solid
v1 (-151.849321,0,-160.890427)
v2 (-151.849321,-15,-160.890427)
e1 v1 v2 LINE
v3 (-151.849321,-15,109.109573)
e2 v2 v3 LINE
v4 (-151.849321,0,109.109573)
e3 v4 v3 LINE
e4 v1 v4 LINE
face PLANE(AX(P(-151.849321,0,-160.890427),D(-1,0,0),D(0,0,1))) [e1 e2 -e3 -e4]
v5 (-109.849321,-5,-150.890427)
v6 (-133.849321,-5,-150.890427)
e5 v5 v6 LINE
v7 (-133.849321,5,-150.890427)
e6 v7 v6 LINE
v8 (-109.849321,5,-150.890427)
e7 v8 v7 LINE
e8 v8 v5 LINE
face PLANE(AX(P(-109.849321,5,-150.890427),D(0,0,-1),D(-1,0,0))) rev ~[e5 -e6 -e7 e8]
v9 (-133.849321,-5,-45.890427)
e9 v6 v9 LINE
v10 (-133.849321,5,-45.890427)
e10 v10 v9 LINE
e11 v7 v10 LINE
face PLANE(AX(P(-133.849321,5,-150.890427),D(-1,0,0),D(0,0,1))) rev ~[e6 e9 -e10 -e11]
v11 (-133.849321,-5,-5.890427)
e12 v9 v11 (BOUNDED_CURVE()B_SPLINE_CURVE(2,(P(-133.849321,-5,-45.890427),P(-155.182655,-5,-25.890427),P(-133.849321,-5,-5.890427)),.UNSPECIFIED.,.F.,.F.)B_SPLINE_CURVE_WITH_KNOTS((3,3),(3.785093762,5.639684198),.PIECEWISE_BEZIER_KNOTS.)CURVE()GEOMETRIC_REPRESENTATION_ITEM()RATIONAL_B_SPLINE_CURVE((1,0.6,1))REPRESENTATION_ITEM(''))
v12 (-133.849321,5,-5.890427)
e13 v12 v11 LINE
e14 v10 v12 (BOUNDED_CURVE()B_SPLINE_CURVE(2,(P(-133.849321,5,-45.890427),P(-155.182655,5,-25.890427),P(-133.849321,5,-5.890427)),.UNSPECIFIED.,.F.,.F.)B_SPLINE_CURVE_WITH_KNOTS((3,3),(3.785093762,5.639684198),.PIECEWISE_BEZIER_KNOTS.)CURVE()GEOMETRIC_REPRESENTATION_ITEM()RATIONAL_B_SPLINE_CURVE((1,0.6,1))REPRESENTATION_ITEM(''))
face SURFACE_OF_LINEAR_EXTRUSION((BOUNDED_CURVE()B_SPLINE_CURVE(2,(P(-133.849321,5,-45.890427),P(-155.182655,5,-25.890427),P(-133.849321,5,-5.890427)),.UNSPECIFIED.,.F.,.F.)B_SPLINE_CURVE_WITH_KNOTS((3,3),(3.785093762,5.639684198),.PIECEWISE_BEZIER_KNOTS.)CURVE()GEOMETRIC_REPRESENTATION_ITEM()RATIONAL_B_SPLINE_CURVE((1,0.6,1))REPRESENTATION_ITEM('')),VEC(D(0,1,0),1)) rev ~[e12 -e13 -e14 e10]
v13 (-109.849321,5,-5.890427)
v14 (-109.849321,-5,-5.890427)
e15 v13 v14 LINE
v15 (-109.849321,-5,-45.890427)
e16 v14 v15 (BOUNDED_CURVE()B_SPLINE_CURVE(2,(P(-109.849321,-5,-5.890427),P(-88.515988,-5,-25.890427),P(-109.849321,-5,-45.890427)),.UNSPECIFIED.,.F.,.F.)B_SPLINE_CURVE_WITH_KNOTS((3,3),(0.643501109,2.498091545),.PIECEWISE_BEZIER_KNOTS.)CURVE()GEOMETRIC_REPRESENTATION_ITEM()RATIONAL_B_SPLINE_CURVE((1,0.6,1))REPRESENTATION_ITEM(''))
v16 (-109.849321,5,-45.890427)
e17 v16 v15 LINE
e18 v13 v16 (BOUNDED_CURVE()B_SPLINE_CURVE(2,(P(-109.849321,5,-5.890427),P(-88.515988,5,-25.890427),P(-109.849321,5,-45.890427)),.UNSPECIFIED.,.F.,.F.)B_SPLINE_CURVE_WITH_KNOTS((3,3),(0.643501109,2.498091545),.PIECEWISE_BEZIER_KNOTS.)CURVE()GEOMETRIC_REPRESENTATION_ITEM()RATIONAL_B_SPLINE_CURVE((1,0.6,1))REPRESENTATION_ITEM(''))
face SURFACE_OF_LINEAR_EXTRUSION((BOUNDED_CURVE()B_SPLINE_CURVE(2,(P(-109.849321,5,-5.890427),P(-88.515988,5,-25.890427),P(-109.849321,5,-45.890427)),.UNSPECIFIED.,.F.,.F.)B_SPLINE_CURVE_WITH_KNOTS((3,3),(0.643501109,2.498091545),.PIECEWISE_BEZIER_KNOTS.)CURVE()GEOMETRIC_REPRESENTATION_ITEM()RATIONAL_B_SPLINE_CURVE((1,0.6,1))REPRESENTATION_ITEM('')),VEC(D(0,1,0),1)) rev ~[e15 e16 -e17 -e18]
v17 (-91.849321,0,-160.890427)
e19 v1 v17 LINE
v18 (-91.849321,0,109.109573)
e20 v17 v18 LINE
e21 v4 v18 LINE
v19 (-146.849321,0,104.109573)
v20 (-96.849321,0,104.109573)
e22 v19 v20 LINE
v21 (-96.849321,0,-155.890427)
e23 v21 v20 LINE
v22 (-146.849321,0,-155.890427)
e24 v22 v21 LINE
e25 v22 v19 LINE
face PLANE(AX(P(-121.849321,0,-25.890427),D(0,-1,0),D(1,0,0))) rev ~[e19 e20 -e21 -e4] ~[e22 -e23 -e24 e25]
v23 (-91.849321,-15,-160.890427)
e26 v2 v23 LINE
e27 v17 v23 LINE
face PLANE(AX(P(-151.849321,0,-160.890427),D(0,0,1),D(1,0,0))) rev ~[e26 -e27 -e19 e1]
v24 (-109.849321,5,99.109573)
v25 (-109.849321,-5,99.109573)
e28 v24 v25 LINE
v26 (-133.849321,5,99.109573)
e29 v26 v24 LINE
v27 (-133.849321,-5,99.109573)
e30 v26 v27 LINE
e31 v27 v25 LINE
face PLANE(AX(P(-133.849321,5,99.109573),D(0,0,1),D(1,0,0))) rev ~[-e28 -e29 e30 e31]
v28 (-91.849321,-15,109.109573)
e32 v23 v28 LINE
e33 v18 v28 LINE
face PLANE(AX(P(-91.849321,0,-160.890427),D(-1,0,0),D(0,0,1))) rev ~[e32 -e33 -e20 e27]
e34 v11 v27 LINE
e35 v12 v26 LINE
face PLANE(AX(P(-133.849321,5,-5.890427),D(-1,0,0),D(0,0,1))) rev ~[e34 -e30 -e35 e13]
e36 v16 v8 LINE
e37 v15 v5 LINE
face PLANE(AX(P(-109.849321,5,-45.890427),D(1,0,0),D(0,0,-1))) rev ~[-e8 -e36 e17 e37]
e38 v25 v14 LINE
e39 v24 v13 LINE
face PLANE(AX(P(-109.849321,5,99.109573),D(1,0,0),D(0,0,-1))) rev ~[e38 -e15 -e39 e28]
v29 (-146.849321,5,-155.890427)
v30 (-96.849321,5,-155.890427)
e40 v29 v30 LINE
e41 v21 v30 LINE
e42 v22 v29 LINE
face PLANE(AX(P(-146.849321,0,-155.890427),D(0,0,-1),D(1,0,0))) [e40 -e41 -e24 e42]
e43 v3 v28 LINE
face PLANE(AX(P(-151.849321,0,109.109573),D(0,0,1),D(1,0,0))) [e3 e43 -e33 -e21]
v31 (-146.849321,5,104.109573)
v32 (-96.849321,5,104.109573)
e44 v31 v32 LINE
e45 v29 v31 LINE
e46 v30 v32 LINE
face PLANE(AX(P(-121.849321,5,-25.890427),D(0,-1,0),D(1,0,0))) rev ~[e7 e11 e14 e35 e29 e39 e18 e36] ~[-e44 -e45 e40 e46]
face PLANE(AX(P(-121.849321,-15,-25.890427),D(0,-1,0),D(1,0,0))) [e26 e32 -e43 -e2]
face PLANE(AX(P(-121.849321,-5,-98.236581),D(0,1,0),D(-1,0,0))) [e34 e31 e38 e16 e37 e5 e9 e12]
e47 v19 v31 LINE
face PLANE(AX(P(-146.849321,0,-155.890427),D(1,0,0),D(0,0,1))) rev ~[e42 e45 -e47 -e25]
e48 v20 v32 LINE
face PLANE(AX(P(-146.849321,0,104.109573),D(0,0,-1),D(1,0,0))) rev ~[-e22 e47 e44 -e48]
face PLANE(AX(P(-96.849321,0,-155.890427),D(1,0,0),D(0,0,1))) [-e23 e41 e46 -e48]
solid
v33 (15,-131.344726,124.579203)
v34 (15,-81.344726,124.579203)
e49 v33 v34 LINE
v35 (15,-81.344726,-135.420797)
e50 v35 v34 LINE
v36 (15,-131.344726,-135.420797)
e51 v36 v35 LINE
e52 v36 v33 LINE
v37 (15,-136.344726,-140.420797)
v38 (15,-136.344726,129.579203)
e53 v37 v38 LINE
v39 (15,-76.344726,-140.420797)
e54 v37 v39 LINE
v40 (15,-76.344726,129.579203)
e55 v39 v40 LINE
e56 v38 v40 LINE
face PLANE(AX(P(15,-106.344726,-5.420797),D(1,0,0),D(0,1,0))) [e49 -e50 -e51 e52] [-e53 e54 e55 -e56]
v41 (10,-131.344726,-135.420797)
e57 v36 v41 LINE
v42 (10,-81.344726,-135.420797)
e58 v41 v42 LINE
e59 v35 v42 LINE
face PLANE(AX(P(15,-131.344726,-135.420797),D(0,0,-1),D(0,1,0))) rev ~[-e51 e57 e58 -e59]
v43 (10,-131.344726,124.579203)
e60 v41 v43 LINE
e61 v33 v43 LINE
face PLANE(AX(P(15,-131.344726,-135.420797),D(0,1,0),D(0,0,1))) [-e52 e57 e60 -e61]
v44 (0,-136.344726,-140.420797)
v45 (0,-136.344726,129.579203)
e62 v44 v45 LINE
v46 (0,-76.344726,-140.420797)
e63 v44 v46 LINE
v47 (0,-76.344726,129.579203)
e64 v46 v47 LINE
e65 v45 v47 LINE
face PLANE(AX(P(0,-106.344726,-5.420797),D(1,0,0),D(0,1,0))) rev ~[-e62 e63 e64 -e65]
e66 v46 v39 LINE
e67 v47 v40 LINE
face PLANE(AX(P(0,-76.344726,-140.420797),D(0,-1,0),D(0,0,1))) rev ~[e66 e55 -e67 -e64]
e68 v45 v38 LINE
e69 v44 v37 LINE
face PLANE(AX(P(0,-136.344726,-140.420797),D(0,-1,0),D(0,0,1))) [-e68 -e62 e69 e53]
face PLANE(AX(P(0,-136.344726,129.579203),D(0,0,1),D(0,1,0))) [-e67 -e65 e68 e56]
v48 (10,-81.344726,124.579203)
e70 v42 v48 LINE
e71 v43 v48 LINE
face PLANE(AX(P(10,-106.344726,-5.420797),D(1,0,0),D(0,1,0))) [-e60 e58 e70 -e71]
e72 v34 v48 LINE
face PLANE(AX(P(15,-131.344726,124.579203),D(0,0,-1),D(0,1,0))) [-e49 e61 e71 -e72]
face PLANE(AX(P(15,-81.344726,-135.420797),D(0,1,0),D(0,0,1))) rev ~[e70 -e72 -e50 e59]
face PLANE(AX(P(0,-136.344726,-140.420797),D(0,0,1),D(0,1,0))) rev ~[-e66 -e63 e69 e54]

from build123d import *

# Parameters (mm, degrees)
F0_W     = 60
F0_H     = 270
F2_DEPTH = 15
F3_W     = 50
F3_H     = 260
F4_DEPTH = 5
F1_W     = 60
F1_H     = 270
F5_DEPTH = 15
F6_W     = 50
F6_H     = 260
F7_DEPTH = 5
F9_DEPTH = 10


# Not quite as in the source:
# - a feature names something its author has since deleted; it is built from what else it names


with BuildPart() as f2:
    # F0 (on Front) → F2 (new body)
    with BuildSketch(Plane.XZ):
        with Locations((-121.8493213905, -25.8904273567)):
            Rectangle(F0_W, F0_H)
    extrude(amount=F2_DEPTH)

    # F3 (on face) → F4 (join)
    with BuildSketch(Plane.XZ):
        with Locations((-121.8493213905, -25.8904273567)):
            Rectangle(F3_W, F3_H)
    extrude(amount=-F4_DEPTH)

    # F8 (on face) → F9 (cut)
    with BuildSketch(Plane(origin=(0, 5, 0), x_dir=(-1, 0, 0), z_dir=(0, 1, 0))):
        with BuildLine():
            Line((109.8493213905, -150.8904273567), (133.8493213905, -150.8904273567))
            Line((133.8493213905, -150.8904273567), (133.8493213905, -45.8904273567))
            add(Edge.make_bspline(
                [(109.8493213905, -45.8904273567), (121.8493213905, -57.1404273567), (133.8493213905, -45.8904273567)],
                knots=[2.4980915448, 2.4980915448, 2.4980915448, 3.7850937624, 3.7850937624, 3.7850937624], degree=2, weights=[1, 0.8, 1]))
            Line((109.8493213905, -45.8904273567), (109.8493213905, -150.8904273567))
        make_face()
        with BuildLine():
            add(Edge.make_bspline(
                [(133.8493213905, -5.8904273567), (128.5159880572, -0.8904273567), (121.8493213905, -0.8904273567)],
                knots=[5.6396841984, 5.6396841984, 5.6396841984, 6.2831853072, 6.2831853072, 6.2831853072], degree=2, weights=[1, 0.9486832981, 1]))
            Line((133.8493213905, -5.8904273567), (133.8493213905, 99.1095726433))
            Line((133.8493213905, 99.1095726433), (109.8493213905, 99.1095726433))
            Line((109.8493213905, 99.1095726433), (109.8493213905, -5.8904273567))
            add(Edge.make_bspline(
                [(121.8493213905, -0.8904273567), (115.1826547239, -0.8904273567), (109.8493213905, -5.8904273567)],
                knots=[0, 0, 0, 0.6435011088, 0.6435011088, 0.6435011088], degree=2, weights=[1, 0.9486832981, 1]))
        make_face()
        with BuildLine():
            Line((133.8493213905, -5.8904273567), (133.8493213905, -45.8904273567))
            add(Edge.make_bspline(
                [(133.8493213905, -45.8904273567), (155.1826547239, -25.8904273567), (133.8493213905, -5.8904273567)],
                knots=[3.7850937624, 3.7850937624, 3.7850937624, 5.6396841984, 5.6396841984, 5.6396841984], degree=2, weights=[1, 0.6, 1]))
        make_face()
        with BuildLine():
            add(Edge.make_bspline(
                [(109.8493213905, -45.8904273567), (121.8493213905, -57.1404273567), (133.8493213905, -45.8904273567)],
                knots=[2.4980915448, 2.4980915448, 2.4980915448, 3.7850937624, 3.7850937624, 3.7850937624], degree=2, weights=[1, 0.8, 1]))
            Line((133.8493213905, -45.8904273567), (133.8493213905, -5.8904273567))
            add(Edge.make_bspline(
                [(133.8493213905, -5.8904273567), (128.5159880572, -0.8904273567), (121.8493213905, -0.8904273567)],
                knots=[5.6396841984, 5.6396841984, 5.6396841984, 6.2831853072, 6.2831853072, 6.2831853072], degree=2, weights=[1, 0.9486832981, 1]))
            add(Edge.make_bspline(
                [(121.8493213905, -0.8904273567), (115.1826547239, -0.8904273567), (109.8493213905, -5.8904273567)],
                knots=[0, 0, 0, 0.6435011088, 0.6435011088, 0.6435011088], degree=2, weights=[1, 0.9486832981, 1]))
            Line((109.8493213905, -5.8904273567), (109.8493213905, -45.8904273567))
        make_face()
        with BuildLine():
            add(Edge.make_bspline(
                [(109.8493213905, -5.8904273567), (88.5159880572, -25.8904273567), (109.8493213905, -45.8904273567)],
                knots=[0.6435011088, 0.6435011088, 0.6435011088, 2.4980915448, 2.4980915448, 2.4980915448], degree=2, weights=[1, 0.6, 1]))
            Line((109.8493213905, -45.8904273567), (109.8493213905, -5.8904273567))
        make_face()
    extrude(amount=-F9_DEPTH, mode=Mode.SUBTRACT)


with BuildPart() as f5:
    # F1 (on Right) → F5 (new body)
    with BuildSketch(Plane.YZ):
        with Locations((-106.3447256267, -5.4207965732)):
            Rectangle(F1_W, F1_H)
    extrude(amount=F5_DEPTH)

    # F6 (on face) → F7 (cut)
    with BuildSketch(Plane.YZ.offset(15)):
        with Locations((-106.3447256267, -5.4207965732)):
            Rectangle(F6_W, F6_H)
    extrude(amount=-F7_DEPTH, mode=Mode.SUBTRACT)


solid = Compound([f2.part, f5.part])
